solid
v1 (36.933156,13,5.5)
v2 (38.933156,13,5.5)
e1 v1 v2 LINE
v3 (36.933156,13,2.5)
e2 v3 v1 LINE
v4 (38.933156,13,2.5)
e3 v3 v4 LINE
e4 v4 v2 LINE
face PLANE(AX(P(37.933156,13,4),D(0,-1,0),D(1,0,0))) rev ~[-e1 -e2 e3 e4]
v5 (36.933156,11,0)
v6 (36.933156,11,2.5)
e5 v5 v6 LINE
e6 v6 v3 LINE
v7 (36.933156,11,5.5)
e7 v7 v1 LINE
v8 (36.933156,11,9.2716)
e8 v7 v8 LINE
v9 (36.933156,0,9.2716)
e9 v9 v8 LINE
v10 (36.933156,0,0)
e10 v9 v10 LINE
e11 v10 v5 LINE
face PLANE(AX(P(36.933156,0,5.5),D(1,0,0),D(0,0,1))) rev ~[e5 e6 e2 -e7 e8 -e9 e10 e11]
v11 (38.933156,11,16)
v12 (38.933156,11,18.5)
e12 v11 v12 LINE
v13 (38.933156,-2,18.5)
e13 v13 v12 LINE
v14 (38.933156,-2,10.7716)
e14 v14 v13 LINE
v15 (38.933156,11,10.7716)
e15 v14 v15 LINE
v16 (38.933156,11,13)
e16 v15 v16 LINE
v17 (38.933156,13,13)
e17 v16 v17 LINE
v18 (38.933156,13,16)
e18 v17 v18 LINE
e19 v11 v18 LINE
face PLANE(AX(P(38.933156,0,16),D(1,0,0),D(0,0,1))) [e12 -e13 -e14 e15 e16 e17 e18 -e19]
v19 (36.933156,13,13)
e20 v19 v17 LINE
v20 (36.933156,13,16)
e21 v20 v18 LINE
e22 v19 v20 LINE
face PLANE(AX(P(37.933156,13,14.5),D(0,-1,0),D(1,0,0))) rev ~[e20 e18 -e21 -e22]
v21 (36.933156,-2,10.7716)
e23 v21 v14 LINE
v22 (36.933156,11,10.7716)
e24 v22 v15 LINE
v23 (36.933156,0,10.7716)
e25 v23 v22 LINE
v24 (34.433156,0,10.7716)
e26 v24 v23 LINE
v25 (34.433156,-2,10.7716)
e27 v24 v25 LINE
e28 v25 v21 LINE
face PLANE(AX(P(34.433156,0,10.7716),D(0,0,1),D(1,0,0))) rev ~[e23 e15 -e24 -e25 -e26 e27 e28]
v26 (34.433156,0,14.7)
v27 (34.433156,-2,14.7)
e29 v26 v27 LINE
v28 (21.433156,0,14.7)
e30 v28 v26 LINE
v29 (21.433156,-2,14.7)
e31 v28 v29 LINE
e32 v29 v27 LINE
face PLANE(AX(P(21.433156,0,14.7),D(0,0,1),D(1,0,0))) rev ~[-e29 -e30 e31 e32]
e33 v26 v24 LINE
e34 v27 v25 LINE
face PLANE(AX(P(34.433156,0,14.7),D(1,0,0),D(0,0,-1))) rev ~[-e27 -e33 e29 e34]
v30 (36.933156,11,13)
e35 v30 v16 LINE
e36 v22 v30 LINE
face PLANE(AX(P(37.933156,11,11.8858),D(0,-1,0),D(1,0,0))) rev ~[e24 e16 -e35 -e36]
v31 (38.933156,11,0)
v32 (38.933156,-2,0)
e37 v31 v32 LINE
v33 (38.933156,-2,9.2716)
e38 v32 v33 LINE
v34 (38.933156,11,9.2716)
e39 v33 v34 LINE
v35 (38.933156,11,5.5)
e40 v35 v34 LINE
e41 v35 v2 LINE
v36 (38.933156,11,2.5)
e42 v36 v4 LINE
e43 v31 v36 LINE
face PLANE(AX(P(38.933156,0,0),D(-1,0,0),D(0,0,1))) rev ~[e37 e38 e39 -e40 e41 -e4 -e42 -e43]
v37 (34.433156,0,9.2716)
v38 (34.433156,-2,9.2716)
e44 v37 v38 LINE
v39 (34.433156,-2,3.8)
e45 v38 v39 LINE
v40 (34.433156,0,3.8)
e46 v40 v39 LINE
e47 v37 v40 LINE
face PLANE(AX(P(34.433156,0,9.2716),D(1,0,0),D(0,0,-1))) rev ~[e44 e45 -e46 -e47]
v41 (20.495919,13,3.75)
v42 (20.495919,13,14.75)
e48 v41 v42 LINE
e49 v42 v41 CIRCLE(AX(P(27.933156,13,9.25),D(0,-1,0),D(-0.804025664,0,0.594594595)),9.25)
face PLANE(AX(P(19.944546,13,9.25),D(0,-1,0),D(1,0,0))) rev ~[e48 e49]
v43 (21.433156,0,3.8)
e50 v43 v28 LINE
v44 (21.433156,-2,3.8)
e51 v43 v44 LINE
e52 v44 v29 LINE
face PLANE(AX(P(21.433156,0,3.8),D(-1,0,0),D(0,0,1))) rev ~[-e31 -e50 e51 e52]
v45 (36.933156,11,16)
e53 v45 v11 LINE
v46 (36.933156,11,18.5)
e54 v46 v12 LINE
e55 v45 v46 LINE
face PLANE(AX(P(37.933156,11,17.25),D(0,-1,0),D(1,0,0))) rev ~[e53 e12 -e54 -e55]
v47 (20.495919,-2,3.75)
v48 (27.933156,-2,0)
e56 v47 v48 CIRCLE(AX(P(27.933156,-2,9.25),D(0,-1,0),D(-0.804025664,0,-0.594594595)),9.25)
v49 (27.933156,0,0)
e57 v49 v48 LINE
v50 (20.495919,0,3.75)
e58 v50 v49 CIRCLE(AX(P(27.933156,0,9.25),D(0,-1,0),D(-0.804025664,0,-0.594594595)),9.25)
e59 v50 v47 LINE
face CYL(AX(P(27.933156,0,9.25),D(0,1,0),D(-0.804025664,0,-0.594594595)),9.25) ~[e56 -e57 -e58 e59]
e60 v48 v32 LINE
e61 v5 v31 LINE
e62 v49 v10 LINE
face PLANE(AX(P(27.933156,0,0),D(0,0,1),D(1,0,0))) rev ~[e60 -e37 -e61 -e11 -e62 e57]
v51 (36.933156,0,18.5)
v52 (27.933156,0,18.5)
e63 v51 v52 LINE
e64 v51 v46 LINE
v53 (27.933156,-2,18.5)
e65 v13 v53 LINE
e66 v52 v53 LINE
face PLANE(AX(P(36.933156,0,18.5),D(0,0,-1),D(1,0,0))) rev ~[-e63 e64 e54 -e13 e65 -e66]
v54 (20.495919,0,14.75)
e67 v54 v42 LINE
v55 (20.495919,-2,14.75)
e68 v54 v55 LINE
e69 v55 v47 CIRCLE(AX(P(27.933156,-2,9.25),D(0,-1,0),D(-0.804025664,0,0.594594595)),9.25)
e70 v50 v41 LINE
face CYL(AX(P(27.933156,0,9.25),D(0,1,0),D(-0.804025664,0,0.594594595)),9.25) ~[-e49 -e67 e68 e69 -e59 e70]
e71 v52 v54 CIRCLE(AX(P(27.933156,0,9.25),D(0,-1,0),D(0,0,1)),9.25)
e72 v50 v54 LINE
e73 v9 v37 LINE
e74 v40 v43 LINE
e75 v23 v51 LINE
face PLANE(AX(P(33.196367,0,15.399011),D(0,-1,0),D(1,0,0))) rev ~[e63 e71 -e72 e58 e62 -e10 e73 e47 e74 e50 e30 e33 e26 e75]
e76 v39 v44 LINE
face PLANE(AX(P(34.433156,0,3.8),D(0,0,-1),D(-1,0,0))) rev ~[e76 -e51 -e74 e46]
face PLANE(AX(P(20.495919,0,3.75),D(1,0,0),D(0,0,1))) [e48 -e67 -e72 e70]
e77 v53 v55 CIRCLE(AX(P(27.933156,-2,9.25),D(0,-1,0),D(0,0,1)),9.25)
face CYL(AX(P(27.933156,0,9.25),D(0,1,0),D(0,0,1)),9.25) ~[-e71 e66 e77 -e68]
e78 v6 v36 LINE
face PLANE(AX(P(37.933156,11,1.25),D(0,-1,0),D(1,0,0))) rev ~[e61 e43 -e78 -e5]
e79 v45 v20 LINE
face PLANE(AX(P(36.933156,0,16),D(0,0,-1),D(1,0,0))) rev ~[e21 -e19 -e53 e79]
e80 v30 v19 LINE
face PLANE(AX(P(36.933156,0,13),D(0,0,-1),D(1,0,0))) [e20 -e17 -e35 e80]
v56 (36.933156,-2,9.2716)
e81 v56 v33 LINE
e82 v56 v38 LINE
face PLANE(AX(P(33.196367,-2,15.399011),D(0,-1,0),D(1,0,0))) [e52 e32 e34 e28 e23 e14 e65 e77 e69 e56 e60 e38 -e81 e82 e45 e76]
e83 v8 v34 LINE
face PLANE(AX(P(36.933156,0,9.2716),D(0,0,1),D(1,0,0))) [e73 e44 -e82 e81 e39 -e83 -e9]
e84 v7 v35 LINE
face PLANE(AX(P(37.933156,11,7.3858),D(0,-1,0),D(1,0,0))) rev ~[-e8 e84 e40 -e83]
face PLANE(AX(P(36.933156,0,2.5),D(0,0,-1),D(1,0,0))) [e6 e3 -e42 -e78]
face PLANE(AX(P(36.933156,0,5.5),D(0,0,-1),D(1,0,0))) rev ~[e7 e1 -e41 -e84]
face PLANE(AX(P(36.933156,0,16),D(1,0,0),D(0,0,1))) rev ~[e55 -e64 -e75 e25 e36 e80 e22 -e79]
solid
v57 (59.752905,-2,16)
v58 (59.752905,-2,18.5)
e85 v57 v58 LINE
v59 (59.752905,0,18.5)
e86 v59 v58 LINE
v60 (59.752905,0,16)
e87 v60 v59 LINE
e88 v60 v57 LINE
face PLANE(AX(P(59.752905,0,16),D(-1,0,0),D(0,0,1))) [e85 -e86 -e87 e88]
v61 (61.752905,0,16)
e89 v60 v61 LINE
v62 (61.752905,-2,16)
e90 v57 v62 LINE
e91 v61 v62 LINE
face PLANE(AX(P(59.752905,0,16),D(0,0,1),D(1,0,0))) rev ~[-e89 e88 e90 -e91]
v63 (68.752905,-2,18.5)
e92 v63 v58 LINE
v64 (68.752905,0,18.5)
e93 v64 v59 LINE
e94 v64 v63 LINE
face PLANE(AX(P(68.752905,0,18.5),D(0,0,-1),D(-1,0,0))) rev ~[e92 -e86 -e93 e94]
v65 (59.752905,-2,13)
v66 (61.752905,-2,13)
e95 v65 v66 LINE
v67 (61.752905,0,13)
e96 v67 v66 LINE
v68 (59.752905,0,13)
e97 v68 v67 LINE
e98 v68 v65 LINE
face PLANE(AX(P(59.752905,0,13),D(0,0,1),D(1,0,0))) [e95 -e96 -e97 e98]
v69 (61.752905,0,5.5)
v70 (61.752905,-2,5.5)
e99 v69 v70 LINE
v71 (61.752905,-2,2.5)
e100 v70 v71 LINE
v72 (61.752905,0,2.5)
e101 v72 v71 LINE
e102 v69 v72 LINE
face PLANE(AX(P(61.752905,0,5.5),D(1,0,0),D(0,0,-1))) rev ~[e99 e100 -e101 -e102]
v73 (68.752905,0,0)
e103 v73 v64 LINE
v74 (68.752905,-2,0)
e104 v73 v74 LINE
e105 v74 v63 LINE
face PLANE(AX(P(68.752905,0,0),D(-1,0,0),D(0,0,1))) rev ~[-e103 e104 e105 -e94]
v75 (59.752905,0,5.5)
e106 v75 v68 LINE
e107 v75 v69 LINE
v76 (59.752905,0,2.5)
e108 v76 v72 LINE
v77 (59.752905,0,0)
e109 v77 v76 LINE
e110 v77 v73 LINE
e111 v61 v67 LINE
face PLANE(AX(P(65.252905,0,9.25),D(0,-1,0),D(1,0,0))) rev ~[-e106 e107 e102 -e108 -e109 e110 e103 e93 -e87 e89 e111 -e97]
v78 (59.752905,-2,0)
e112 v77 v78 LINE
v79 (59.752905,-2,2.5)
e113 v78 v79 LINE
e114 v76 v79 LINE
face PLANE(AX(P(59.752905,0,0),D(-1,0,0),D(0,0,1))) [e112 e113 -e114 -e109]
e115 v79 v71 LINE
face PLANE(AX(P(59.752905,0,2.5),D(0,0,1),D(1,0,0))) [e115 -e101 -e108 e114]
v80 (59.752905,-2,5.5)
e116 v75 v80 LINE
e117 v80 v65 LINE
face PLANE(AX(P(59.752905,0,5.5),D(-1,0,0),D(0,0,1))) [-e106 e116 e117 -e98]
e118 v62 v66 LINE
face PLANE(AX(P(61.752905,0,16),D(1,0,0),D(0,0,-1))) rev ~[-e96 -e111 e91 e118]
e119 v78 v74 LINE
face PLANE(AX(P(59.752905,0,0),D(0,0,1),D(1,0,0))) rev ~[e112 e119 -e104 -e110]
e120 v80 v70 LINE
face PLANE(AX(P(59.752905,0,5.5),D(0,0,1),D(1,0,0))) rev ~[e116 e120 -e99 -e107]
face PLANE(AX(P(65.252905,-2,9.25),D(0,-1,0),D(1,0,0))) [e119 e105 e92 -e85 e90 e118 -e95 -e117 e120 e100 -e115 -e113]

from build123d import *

# Parameters (mm, degrees)
F0_W     = 2
F0_H     = 2.5
F0_H_2   = 3
F0_H_3   = 2.2283997163
F0_H_4   = 3.7716002837
F1_DEPTH = 2
F0_H_5   = 7.5
F2_DEPTH = 13
F3_DEPTH = 11


# Not quite as in the source:
# - a feature names something its author has since deleted; it is built from what else it names


with BuildPart() as f1:
    # F0 (on Front) → F1 (new body)
    with BuildSketch(Plane.XZ):
        Polygon((27.9331561178, 18.5), (27.9331561178, 14.7), (34.4331561178, 14.7), (34.4331561178, 10.7716002837), (36.9331561178, 10.7716002837), (36.9331561178, 13), (36.9331561178, 16), (36.9331561178, 18.5), align=None)
        with BuildLine():
            ThreePointArc((20.4959187275, 3.75), (23.7685733056, 0.9905357317), (27.9331561178, 0))
            Line((27.9331561178, 0), (27.9331561178, 3.8))
            Line((27.9331561178, 3.8), (21.4331561178, 3.8))
            Line((21.4331561178, 3.8), (21.4331561178, 14.7))
            Line((21.4331561178, 14.7), (27.9331561178, 14.7))
            Line((27.9331561178, 14.7), (27.9331561178, 18.5))
            ThreePointArc((27.9331561178, 18.5), (23.7685733056, 17.5094642683), (20.4959187275, 14.75))
            Line((20.4959187275, 14.75), (20.4959187275, 3.75))
        make_face()
        Polygon((27.9331561178, 3.8), (27.9331561178, 0), (36.9331561178, 0), (36.9331561178, 2.5), (36.9331561178, 5.5), (36.9331561178, 9.2716002837), (34.4331561178, 9.2716002837), (34.4331561178, 3.8), align=None)
        with Locations((37.9331561178, 17.25)):
            Rectangle(F0_W, F0_H)
        with Locations((37.9331561178, 14.5)):
            Rectangle(F0_W, F0_H_2)
        with Locations((37.9331561178, 11.8858001418)):
            Rectangle(F0_W, F0_H_3)
        with Locations((37.9331561178, 7.3858001418)):
            Rectangle(F0_W, F0_H_4)
        with Locations((37.9331561178, 4)):
            Rectangle(F0_W, F0_H_2)
        with Locations((37.9331561178, 1.25)):
            Rectangle(F0_W, F0_H)
        with BuildLine():
            ThreePointArc((20.4959187275, 14.75), (18.6831561178, 9.25), (20.4959187275, 3.75))
            Line((20.4959187275, 3.75), (20.4959187275, 14.75))
        make_face()
    extrude(amount=F1_DEPTH)

    # F0 (on Front) → F2 (join)
    with BuildSketch(Plane.XZ):
        with Locations((37.9331561178, 14.5)):
            Rectangle(F0_W, F0_H_2)
        with Locations((37.9331561178, 4)):
            Rectangle(F0_W, F0_H_2)
        with BuildLine():
            ThreePointArc((20.4959187275, 14.75), (18.6831561178, 9.25), (20.4959187275, 3.75))
            Line((20.4959187275, 3.75), (20.4959187275, 14.75))
        make_face()
    extrude(amount=-F2_DEPTH)

    # F0 (on Front) → F3 (join)
    with BuildSketch(Plane.XZ):
        with Locations((37.9331561178, 17.25)):
            Rectangle(F0_W, F0_H)
        with Locations((37.9331561178, 11.8858001418)):
            Rectangle(F0_W, F0_H_3)
        with Locations((37.9331561178, 7.3858001418)):
            Rectangle(F0_W, F0_H_4)
        with Locations((37.9331561178, 1.25)):
            Rectangle(F0_W, F0_H)
    extrude(amount=-F3_DEPTH)


with BuildPart() as f1b:
    # F0 (on Front) → F1, piece 2 (new body)
    with BuildSketch(Plane.XZ):
        Polygon((68.7529053539, 18.5), (61.7529053539, 18.5), (61.7529053539, 16), (61.7529053539, 13), (61.7529053539, 5.5), (61.7529053539, 2.5), (61.7529053539, 0), (68.7529053539, 0), align=None)
        with Locations((60.7529053539, 17.25)):
            Rectangle(F0_W, F0_H)
        with Locations((60.7529053539, 9.25)):
            Rectangle(F0_W, F0_H_5)
        with Locations((60.7529053539, 1.25)):
            Rectangle(F0_W, F0_H)
    extrude(amount=F1_DEPTH)


solid = Compound([f1.part, f1b.part])
